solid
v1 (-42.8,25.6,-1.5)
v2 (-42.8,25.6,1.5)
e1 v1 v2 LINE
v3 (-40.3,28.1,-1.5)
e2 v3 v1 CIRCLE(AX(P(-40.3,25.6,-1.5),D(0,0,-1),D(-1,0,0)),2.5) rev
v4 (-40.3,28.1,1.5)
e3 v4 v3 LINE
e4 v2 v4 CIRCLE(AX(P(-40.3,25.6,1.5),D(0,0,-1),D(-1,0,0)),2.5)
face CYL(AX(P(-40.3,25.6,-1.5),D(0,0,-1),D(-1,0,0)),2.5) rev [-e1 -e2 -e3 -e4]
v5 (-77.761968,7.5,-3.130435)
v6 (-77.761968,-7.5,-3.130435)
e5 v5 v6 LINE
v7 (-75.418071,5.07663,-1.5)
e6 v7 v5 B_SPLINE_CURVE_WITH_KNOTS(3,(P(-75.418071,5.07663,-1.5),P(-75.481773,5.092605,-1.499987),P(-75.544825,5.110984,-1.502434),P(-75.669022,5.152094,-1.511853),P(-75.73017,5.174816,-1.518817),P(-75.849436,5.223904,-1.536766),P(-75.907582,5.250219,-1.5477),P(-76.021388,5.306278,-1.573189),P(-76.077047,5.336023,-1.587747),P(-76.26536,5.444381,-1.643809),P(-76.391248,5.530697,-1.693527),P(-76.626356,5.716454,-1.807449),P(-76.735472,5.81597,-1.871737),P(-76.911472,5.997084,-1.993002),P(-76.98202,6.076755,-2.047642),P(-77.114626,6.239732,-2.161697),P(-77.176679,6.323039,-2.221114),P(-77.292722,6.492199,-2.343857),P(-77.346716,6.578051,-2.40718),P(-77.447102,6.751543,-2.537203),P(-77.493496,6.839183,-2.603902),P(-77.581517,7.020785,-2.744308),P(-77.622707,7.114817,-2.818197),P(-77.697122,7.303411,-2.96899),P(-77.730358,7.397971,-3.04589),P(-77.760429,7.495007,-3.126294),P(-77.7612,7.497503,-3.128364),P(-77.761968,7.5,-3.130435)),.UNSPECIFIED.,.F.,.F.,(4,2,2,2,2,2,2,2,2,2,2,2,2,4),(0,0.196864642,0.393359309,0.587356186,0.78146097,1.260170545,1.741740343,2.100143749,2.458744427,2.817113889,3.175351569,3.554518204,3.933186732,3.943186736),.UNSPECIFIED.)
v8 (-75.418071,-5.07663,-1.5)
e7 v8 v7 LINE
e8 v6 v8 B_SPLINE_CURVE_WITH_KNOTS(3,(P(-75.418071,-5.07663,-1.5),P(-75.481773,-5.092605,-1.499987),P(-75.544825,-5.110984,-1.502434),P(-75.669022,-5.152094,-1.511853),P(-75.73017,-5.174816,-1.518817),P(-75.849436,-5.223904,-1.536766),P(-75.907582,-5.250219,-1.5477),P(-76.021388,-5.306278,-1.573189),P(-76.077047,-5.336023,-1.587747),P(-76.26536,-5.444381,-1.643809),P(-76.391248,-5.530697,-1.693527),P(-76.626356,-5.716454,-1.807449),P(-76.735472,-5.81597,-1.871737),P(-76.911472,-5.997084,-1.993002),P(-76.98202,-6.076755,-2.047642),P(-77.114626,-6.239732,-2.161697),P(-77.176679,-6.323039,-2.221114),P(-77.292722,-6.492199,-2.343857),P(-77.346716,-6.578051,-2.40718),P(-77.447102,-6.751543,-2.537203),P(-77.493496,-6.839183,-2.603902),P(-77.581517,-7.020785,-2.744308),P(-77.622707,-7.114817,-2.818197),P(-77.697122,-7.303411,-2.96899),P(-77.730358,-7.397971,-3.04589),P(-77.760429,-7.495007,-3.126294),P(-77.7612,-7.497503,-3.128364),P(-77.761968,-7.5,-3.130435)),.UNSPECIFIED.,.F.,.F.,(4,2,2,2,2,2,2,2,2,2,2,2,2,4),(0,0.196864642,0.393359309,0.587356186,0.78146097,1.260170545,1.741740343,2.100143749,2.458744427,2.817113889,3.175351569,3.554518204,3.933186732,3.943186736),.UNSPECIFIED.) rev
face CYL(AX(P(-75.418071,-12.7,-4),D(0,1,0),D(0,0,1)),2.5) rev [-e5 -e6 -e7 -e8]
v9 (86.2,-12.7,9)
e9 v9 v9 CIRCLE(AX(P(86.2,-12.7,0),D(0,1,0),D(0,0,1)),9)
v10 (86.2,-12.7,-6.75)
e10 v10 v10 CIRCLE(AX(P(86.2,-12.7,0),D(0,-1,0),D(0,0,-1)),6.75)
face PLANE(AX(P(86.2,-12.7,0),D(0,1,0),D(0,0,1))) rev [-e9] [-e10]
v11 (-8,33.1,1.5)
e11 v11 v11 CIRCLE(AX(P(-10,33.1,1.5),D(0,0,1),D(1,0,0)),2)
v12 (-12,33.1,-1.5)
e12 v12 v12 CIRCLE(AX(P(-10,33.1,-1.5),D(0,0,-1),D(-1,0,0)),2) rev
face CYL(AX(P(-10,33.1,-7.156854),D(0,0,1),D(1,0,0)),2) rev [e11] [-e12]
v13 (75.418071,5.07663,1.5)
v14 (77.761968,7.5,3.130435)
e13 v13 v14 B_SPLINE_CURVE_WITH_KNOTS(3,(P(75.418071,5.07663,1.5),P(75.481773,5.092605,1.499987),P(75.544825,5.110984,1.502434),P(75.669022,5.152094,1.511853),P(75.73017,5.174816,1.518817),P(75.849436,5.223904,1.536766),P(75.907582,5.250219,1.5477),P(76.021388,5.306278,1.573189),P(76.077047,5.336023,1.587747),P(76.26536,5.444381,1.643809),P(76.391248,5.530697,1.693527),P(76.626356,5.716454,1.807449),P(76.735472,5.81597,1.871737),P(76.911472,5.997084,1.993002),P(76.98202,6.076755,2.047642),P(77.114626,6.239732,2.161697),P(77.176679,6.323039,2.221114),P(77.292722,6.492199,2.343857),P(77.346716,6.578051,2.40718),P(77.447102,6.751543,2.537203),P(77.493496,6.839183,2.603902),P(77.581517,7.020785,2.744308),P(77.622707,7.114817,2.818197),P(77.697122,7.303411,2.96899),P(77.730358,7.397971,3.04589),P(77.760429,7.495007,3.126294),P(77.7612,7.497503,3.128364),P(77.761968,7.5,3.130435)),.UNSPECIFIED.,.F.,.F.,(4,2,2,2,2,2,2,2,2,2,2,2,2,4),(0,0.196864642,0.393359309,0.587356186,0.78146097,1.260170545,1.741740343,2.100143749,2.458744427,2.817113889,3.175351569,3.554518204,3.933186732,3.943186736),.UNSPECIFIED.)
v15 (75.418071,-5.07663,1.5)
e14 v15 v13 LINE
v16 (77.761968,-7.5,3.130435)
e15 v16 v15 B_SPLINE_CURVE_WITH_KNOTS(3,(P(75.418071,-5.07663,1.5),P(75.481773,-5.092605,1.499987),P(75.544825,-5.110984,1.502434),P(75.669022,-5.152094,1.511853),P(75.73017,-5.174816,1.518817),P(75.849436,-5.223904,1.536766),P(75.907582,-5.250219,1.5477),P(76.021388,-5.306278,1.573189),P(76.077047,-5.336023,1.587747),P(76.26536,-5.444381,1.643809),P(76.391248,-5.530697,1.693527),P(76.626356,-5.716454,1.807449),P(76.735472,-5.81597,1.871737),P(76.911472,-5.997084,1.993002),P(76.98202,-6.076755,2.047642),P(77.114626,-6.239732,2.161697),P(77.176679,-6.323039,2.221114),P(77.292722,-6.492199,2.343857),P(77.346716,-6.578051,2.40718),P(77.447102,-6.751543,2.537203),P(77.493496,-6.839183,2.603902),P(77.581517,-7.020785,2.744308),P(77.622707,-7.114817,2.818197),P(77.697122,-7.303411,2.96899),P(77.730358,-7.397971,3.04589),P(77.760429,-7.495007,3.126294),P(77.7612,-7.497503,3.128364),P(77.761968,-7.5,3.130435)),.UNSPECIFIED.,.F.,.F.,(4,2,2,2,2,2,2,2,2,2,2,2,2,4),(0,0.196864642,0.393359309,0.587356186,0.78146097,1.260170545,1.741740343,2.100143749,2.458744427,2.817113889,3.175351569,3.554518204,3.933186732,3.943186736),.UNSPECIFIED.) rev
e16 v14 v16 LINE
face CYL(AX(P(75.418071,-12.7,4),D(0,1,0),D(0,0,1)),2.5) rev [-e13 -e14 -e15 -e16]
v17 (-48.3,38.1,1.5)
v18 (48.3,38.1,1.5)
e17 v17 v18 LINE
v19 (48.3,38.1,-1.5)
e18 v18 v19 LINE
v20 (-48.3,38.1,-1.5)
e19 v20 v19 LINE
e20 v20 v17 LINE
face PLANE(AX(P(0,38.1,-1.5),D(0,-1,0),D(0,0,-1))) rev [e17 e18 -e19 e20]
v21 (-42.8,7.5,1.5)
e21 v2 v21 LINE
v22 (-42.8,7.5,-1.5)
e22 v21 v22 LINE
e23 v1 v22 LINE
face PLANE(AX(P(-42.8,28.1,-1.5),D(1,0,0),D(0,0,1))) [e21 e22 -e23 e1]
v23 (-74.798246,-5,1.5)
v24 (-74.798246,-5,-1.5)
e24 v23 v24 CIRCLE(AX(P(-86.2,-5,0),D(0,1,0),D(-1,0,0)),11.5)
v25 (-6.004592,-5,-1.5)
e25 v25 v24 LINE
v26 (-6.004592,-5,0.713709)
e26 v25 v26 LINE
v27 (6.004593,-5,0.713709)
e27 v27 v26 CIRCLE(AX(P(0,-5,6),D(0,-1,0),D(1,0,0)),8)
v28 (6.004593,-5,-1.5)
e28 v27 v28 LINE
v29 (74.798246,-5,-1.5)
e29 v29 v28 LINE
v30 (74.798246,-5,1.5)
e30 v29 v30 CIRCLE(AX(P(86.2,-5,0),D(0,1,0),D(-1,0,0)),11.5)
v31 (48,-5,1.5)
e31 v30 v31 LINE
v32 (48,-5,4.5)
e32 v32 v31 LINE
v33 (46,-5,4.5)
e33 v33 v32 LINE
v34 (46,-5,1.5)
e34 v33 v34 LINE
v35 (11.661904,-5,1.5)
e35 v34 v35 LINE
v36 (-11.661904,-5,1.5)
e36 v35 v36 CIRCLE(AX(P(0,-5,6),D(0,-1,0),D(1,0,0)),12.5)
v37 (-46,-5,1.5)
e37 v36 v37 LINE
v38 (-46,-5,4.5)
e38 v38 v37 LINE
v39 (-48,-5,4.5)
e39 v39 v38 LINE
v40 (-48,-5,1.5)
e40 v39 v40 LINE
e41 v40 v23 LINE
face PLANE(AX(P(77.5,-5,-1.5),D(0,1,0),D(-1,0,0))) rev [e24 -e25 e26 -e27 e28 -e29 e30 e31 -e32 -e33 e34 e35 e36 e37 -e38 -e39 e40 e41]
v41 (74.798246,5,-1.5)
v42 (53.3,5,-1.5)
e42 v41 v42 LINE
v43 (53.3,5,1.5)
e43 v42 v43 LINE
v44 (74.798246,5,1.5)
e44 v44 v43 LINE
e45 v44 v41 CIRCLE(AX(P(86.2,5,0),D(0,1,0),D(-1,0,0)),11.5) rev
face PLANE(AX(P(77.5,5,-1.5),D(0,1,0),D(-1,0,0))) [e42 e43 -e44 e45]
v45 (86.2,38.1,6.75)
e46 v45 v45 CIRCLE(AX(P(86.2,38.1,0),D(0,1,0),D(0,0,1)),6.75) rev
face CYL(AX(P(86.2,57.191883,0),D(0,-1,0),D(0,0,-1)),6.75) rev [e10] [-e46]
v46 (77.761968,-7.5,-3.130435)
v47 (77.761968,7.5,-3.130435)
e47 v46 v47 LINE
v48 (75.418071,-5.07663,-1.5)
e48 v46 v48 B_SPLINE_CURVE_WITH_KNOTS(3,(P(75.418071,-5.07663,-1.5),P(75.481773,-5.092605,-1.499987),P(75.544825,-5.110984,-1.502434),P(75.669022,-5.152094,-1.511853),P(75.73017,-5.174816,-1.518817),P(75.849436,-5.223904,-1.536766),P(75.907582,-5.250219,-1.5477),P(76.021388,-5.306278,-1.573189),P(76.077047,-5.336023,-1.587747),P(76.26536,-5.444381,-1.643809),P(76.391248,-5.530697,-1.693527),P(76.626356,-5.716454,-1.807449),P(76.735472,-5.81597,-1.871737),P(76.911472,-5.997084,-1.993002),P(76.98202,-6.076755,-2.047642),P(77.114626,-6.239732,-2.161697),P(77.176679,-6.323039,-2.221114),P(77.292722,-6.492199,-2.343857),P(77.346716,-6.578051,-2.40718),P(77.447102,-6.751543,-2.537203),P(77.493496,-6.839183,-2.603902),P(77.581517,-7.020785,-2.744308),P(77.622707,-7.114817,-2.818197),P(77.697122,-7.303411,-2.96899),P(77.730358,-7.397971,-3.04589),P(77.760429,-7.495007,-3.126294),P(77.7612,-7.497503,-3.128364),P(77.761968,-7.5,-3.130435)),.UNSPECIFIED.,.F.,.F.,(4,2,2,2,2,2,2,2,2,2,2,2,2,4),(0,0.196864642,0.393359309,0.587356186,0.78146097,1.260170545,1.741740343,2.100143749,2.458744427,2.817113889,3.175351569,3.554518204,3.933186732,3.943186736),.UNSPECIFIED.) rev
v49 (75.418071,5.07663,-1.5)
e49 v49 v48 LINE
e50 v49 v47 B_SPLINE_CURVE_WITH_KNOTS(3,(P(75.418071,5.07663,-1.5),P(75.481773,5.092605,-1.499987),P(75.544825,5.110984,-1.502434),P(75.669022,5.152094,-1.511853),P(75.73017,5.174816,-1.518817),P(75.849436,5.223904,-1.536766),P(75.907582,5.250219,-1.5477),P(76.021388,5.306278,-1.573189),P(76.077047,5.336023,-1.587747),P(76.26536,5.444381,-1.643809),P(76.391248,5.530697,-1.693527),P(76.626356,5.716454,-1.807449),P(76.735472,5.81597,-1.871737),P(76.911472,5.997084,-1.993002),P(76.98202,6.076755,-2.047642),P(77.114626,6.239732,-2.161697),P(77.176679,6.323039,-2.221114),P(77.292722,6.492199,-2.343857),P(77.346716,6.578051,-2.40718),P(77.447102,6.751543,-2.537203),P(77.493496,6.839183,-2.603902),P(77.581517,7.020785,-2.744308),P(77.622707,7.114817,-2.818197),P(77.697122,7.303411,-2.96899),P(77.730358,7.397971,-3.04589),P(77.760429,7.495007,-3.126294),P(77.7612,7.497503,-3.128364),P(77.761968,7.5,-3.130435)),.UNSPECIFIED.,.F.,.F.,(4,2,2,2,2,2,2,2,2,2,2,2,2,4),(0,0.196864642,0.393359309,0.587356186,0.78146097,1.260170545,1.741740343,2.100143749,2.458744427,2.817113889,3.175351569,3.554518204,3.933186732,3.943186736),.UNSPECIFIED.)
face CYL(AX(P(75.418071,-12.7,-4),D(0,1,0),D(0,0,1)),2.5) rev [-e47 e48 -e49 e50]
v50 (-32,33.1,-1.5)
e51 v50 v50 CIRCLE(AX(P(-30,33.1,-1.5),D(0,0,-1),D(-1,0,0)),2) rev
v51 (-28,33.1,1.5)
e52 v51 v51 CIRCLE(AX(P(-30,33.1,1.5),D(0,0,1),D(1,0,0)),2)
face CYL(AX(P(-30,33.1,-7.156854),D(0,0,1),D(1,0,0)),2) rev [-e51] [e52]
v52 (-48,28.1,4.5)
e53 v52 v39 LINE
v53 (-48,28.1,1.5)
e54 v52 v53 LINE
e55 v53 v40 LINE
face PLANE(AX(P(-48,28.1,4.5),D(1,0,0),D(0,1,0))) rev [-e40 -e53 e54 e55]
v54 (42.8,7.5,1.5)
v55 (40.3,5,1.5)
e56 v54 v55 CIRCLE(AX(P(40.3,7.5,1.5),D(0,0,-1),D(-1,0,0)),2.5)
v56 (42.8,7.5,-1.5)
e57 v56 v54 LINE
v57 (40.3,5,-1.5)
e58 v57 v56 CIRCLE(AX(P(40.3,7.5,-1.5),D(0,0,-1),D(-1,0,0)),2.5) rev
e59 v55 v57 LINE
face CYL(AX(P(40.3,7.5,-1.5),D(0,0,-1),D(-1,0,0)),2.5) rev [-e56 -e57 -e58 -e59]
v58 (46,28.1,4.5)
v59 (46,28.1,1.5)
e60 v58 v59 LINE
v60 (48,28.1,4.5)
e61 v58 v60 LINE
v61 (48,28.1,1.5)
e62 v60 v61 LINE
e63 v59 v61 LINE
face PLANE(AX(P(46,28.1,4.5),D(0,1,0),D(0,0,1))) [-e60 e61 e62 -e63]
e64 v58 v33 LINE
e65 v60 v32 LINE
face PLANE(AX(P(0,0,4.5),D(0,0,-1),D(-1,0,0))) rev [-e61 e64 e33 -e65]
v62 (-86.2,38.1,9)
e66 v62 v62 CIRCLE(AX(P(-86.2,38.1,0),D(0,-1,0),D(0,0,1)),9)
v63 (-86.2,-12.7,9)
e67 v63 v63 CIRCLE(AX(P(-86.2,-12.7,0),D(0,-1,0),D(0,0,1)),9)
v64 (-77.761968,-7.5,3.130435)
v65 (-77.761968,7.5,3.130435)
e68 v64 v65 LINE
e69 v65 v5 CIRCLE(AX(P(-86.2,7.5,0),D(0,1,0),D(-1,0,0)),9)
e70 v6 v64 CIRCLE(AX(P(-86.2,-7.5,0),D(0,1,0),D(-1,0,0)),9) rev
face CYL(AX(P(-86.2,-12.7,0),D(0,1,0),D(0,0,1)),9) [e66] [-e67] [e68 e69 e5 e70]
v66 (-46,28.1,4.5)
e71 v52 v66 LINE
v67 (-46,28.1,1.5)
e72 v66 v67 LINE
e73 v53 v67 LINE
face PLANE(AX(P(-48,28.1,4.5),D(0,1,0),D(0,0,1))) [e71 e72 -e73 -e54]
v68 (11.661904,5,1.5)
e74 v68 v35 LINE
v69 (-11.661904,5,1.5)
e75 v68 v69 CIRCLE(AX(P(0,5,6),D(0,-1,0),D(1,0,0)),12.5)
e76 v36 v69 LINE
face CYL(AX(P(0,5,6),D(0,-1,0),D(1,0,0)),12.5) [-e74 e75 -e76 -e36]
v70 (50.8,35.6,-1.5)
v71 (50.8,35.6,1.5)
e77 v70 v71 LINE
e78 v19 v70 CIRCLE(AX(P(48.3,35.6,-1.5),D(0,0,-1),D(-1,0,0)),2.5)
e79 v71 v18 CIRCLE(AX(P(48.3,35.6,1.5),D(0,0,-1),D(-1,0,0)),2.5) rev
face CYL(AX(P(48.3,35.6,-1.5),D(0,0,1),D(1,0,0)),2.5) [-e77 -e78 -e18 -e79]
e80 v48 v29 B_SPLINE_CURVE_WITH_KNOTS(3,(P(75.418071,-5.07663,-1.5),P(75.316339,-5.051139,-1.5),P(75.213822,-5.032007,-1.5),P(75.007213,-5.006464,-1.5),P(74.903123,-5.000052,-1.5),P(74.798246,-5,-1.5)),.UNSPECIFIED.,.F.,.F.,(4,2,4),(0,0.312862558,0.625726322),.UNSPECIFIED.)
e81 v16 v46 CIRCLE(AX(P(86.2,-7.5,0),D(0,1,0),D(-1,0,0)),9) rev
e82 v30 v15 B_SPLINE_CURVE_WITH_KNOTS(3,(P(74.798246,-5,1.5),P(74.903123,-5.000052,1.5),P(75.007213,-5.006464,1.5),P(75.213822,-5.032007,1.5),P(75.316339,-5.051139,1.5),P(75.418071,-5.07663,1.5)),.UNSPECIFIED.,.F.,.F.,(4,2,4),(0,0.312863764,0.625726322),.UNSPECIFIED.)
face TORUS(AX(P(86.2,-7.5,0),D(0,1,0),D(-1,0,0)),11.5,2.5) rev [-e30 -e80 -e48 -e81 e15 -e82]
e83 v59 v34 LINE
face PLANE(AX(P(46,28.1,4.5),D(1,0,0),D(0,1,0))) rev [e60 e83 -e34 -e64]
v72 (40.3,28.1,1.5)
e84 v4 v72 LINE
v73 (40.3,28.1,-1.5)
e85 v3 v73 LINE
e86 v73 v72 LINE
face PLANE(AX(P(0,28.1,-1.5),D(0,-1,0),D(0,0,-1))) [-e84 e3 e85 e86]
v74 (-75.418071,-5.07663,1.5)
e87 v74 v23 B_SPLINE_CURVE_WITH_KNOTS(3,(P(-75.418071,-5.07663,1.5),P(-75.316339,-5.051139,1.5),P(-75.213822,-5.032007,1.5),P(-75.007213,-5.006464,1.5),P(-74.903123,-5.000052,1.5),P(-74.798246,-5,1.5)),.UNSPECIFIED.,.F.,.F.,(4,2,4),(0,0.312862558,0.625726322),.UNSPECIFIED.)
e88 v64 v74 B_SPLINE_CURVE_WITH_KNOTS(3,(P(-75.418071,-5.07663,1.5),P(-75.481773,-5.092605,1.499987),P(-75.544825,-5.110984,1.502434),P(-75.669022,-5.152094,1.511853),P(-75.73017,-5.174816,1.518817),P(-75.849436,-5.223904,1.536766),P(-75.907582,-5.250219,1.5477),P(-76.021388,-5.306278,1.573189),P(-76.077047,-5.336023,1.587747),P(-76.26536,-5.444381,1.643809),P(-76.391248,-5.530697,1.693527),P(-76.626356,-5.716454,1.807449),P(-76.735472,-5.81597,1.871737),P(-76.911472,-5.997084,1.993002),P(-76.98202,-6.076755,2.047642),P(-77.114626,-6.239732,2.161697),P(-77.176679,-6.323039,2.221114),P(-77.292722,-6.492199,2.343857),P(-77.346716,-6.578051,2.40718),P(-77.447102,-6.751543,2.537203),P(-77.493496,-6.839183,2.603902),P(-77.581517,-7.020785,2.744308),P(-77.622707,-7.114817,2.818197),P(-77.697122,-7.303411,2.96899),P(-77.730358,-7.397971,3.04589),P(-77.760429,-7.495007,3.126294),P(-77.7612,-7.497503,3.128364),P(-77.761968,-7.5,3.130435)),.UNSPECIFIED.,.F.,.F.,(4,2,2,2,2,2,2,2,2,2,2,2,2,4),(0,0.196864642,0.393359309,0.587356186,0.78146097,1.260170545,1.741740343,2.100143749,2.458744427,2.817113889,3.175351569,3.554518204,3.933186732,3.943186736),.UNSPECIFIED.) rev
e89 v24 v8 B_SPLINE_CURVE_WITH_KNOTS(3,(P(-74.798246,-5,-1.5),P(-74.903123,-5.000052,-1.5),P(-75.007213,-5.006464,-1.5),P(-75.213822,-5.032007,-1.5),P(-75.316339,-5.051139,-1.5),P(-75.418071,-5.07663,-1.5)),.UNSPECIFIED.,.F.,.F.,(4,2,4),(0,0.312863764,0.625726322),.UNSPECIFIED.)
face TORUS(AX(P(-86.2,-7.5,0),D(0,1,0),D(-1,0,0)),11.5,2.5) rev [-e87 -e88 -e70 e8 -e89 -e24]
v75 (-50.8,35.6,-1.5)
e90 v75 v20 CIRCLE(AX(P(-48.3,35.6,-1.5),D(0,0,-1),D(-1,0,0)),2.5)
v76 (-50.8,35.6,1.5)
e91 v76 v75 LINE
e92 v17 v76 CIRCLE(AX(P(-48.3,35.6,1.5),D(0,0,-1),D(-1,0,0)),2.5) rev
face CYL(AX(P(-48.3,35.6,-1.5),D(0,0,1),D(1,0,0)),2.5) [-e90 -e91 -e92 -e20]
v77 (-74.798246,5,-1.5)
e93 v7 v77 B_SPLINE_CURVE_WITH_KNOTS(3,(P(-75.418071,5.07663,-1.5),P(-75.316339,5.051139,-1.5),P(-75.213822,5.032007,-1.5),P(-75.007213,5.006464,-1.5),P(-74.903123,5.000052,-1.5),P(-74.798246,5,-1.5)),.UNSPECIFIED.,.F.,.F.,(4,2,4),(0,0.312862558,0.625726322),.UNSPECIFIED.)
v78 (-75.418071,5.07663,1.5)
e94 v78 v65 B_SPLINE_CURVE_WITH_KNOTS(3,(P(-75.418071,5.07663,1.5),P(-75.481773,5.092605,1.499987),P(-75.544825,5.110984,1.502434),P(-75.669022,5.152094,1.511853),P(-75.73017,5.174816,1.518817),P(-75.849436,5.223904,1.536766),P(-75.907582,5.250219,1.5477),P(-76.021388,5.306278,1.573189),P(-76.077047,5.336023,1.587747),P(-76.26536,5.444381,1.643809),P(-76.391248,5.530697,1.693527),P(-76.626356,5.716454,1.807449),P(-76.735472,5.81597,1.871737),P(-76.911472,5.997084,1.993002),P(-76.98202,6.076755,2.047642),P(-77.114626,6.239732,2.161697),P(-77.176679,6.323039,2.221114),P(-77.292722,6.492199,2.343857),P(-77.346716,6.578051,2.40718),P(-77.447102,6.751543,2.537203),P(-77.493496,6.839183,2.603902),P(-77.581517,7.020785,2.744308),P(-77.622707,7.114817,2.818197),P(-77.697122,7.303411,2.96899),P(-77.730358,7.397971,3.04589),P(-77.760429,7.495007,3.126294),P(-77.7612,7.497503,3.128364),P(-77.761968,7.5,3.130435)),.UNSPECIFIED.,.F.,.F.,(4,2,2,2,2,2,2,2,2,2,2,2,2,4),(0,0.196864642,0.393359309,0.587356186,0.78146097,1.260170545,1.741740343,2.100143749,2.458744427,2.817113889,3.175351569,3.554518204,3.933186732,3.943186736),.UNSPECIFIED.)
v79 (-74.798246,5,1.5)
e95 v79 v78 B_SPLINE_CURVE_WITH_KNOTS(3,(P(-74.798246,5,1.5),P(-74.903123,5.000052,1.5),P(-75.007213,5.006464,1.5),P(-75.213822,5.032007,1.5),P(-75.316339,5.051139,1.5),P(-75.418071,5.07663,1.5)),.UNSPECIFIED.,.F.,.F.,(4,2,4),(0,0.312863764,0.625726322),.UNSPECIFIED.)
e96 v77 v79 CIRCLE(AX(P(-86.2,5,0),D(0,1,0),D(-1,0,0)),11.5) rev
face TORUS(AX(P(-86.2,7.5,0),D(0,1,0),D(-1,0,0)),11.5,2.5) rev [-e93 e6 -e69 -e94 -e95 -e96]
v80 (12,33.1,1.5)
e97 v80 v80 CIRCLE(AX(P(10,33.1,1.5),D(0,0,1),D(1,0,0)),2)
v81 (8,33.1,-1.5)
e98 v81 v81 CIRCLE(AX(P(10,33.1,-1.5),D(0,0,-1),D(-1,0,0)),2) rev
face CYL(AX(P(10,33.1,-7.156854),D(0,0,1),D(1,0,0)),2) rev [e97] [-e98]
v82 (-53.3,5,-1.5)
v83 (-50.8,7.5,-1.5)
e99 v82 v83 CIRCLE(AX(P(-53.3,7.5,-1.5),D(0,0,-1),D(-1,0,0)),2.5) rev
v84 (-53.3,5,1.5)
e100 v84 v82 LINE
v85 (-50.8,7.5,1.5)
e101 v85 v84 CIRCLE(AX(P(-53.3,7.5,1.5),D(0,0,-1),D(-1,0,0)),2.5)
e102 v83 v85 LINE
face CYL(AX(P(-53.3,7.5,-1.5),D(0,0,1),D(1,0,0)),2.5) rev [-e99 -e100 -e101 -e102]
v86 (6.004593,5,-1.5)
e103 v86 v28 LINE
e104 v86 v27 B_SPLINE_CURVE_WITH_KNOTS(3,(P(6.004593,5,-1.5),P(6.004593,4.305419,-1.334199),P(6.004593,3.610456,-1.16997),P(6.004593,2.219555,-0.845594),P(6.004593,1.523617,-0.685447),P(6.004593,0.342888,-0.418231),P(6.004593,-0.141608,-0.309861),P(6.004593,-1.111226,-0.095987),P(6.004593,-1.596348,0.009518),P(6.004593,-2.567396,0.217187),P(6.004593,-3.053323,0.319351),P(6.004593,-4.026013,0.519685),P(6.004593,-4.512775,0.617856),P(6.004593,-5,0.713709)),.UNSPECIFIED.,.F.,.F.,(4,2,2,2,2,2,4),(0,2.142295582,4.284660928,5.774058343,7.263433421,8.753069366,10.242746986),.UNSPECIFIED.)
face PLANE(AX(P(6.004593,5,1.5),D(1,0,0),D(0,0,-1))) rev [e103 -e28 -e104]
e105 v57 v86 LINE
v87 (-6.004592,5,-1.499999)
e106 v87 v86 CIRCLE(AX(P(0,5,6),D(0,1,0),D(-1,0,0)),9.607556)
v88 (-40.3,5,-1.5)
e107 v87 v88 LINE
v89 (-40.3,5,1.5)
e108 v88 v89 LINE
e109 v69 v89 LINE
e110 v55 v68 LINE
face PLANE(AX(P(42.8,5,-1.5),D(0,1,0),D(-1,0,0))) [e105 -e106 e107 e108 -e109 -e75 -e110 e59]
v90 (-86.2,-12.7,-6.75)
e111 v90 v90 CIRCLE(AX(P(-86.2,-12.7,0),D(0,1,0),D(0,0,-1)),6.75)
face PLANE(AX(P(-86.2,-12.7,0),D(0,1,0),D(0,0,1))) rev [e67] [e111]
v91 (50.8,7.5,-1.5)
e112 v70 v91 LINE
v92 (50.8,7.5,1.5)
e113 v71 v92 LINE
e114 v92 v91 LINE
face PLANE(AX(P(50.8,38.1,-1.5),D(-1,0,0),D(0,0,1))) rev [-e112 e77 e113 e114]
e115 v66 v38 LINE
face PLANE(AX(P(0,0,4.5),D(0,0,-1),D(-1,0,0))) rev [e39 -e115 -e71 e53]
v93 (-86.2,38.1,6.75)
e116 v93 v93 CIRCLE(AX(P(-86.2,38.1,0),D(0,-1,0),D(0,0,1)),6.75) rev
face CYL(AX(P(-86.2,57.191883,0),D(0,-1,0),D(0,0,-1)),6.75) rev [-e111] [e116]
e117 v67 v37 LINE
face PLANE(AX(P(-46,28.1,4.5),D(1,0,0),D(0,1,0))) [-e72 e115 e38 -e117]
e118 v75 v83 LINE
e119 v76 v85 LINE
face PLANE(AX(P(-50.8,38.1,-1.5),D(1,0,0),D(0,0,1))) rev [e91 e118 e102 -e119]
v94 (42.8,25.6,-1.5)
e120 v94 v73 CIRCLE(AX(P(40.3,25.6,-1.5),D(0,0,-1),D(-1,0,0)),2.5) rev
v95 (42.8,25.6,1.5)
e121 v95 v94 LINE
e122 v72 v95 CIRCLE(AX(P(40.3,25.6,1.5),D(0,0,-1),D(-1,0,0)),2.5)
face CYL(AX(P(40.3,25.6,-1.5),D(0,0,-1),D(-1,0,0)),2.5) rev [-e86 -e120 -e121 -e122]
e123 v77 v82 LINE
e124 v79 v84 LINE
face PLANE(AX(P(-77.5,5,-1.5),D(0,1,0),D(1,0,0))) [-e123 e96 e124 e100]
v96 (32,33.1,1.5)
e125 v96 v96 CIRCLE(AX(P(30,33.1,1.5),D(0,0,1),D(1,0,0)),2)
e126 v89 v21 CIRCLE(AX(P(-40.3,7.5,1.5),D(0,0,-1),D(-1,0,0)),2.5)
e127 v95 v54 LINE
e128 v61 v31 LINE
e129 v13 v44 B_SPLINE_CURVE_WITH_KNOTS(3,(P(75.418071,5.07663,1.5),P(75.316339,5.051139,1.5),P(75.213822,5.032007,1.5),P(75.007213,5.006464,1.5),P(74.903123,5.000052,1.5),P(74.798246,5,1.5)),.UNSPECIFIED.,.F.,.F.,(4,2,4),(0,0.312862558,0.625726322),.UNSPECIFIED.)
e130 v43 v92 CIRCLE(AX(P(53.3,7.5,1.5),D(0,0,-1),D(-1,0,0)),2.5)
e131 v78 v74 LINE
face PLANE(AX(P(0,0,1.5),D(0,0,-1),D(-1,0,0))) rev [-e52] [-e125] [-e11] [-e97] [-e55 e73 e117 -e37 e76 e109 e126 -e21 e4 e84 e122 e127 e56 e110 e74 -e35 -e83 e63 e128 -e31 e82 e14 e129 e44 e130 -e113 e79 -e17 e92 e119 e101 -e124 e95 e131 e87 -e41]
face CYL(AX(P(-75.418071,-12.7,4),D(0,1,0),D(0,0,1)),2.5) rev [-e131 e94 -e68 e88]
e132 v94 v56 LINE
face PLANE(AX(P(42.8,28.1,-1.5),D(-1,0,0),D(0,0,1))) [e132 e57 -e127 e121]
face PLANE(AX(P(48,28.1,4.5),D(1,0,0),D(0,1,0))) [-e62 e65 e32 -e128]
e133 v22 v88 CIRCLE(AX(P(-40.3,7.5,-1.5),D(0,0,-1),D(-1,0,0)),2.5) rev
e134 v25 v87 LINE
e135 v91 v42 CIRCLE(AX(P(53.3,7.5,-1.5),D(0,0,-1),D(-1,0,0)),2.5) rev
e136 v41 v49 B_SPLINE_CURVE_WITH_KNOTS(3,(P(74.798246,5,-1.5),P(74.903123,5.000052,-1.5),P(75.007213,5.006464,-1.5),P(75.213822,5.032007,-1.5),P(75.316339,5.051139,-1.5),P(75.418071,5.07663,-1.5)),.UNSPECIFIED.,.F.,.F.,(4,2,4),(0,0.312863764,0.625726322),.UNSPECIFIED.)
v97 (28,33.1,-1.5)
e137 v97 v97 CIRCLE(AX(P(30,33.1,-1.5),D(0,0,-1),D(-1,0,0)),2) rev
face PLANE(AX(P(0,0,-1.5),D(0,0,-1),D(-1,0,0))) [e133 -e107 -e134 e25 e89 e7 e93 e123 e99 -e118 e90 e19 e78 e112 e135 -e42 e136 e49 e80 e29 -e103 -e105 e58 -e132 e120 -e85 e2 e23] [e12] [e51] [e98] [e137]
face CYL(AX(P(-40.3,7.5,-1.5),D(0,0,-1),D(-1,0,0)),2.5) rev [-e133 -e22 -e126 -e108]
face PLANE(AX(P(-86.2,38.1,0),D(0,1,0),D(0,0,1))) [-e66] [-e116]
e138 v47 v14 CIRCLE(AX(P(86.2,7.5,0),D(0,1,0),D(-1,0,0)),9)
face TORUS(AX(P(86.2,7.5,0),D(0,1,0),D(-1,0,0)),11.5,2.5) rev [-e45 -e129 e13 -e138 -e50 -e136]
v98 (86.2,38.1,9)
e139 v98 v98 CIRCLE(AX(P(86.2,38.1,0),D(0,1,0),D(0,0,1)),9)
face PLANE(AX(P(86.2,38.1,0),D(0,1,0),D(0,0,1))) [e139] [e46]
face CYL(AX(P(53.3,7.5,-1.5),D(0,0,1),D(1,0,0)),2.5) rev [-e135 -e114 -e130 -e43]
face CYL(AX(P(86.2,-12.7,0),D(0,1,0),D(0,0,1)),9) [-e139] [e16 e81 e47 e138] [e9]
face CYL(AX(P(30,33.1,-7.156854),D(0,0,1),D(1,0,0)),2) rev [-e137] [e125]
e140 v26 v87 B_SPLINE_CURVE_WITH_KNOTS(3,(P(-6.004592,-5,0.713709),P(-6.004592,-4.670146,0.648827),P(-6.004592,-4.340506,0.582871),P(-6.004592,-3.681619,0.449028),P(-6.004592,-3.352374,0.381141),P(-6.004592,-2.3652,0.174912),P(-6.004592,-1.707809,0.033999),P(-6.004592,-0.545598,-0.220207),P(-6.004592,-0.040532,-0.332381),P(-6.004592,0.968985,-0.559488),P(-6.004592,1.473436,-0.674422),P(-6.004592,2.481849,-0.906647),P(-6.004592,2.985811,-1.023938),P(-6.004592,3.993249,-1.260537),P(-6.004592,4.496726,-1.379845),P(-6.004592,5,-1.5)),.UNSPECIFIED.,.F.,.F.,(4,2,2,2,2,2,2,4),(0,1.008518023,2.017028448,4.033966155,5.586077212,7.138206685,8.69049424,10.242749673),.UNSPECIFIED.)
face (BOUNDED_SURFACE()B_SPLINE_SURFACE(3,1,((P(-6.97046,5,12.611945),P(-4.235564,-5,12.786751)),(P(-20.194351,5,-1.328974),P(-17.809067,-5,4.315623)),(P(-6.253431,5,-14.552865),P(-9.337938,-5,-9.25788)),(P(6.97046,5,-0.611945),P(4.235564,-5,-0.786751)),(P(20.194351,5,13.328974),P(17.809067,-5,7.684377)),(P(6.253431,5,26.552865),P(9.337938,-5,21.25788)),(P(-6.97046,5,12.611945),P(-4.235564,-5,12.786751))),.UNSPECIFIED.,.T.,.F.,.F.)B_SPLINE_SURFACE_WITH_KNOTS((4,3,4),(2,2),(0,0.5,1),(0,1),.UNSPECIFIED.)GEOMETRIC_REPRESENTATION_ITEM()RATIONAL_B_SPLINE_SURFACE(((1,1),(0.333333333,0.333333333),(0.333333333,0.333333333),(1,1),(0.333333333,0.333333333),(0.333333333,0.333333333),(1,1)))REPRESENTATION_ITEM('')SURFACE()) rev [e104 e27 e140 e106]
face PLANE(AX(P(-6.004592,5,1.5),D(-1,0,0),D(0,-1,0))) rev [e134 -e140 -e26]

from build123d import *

# Parameters (mm, degrees)
BOSS_EXTRUDE1_DEPTH      = 38.1
BOSS_EXTRUDE1_DEPTH_BACK = 12.7
SKETCH1_R                = 9
SKETCH2_R                = 6.75
CUT_EXTRUDE1_DEPTH       = 50.8
BOSS_EXTRUDE2_DEPTH      = 1.5
BOSS_EXTRUDE2_DEPTH_BACK = 1.5
BOSS_EXTRUDE3_DEPTH      = 10
SKETCH9_W                = 12.009184536
SKETCH9_H                = 15.938825618
CUT_EXTRUDE2_DEPTH       = 3
SKETCH10_R               = 2
CUT_EXTRUDE3_DEPTH       = 3
SKETCH11_W               = 2
SKETCH11_H               = 33.1
BOSS_EXTRUDE4_DEPTH      = 3
FILLET1_R                = 2.5


with BuildPart() as part:
    # Sketch1 → Boss-Extrude1 (new, two sides: drawn at the far end of the back side and taken through both)
    with BuildSketch(Plane(origin=(0, 0, 0), x_dir=(1, 0, 0), z_dir=(0, 1, 0)).offset(-BOSS_EXTRUDE1_DEPTH_BACK)):
        with Locations(Location((86.2, 0, 0), (0, 0, 270))):
            Circle(SKETCH1_R)
    extrude(amount=BOSS_EXTRUDE1_DEPTH + BOSS_EXTRUDE1_DEPTH_BACK)

    # Sketch2 → Cut-Extrude1 (cut)
    with BuildSketch(Plane(origin=(0, -12.7, 0), x_dir=(-1, 0, 0), z_dir=(0, -1, 0))):
        with Locations(Location((-86.2, 0, 0), (0, 0, 90))):
            Circle(SKETCH2_R)
    extrude(amount=-CUT_EXTRUDE1_DEPTH, mode=Mode.SUBTRACT)

    # Sketch4 → Boss-Extrude2 (add, two sides: drawn at the far end of the back side and taken through both)
    with BuildSketch(Plane.XY.offset(-BOSS_EXTRUDE2_DEPTH_BACK)):
        Polygon((77.5, -5), (0, -5), (0, 5), (42.8, 5), (42.8, 28.1), (0, 28.1), (0, 38.1), (50.8, 38.1), (50.8, 28.1), (50.8, 5), (77.5, 5), align=None)
    extrude(amount=BOSS_EXTRUDE2_DEPTH + BOSS_EXTRUDE2_DEPTH_BACK)

    # Mirror2: part across plane


with BuildPart() as part_1:
    add(part.part)
    add(part.part.mirror(Plane(origin=(0, 38.1, -1.5), x_dir=(0, 0, 1), z_dir=(-1, 0, 0))))

    # Sketch6 → Boss-Extrude3 (add)
    with BuildSketch(Plane.XZ.offset(5)):
        with BuildLine():
            Line((10, -1.5), (-10, -1.5))
            ThreePointArc((-10, -1.5), (0, 18.5), (10, -1.5))
        make_face()
    extrude(amount=-BOSS_EXTRUDE3_DEPTH)

    # Cut-Loft1: read off the stored shape, not the designer's step
    # Cut-Loft1: loft between two sections, ruled curve by curve
    cut_loft1_from = [
        Edge.make_bspline([(-6.970459828, 5, 12.611945372), (-20.194350572, 5, -1.328974284), (-6.253430916, 5, -14.552865027), (6.970459828, 5, -0.611945372), (20.194350572, 5, 13.328974284), (6.253430916, 5, 26.552865027), (-6.970459828, 5, 12.611945372)], [0, 0, 0, 0, 0.5, 0.5, 0.5, 1, 1, 1, 1], 3, [1, 0.333333333, 0.333333333, 1, 0.333333333, 0.333333333, 1]),
    ]
    cut_loft1_to = [
        Edge.make_bspline([(-4.235564338, -5, 12.786751413), (-17.809067164, -5, 4.315622738), (-9.337938488, -5, -9.257880088), (4.235564338, -5, -0.786751413), (17.809067164, -5, 7.684377262), (9.337938488, -5, 21.257880088), (-4.235564338, -5, 12.786751413)], [0, 0, 0, 0, 0.5, 0.5, 0.5, 1, 1, 1, 1], 3, [1, 0.333333333, 0.333333333, 1, 0.333333333, 0.333333333, 1]),
    ]
    cut_loft1 = Solid(Shell([*[Face.make_surface_from_curves(cut_loft1_from[k], cut_loft1_to[k]) for k in range(1)], Face(Wire(cut_loft1_from)), Face(Wire(cut_loft1_to))]))
    add(cut_loft1, mode=Mode.SUBTRACT)

    # Sketch9 → Cut-Extrude2 (cut)
    with BuildSketch(Plane(origin=(0, 0, -1.5), x_dir=(-1, 0, 0), z_dir=(0, 0, -1))):
        with Locations((-2.92e-07, -2.969412809)):
            Rectangle(SKETCH9_W, SKETCH9_H)
    extrude(amount=-CUT_EXTRUDE2_DEPTH, mode=Mode.SUBTRACT)

    # Sketch10 → Cut-Extrude3 (cut)
    with BuildSketch(Plane.XY.offset(1.5)):
        with Locations((-30, 33.1)):
            Circle(SKETCH10_R)
        with Locations((-10, 33.1)):
            Circle(SKETCH10_R)
        with Locations((10, 33.1)):
            Circle(SKETCH10_R)
        with Locations((30, 33.1)):
            Circle(SKETCH10_R)
    extrude(amount=-CUT_EXTRUDE3_DEPTH, mode=Mode.SUBTRACT)

    # Sketch11 → Boss-Extrude4 (add)
    with BuildSketch(Plane.XY.offset(1.5)):
        with Locations((-47, 11.55)):
            Rectangle(SKETCH11_W, SKETCH11_H)
        with Locations((47, 11.55)):
            Rectangle(SKETCH11_W, SKETCH11_H)
    extrude(amount=BOSS_EXTRUDE4_DEPTH)

    # Fillet1
    fillet1_edges = [part_1.edges().sort_by_distance(p)[0] for p in [
        (50.8, 5, 0),
        (-50.8, 5, 0),
        (-42.8, 5, 0),
        (-42.8, 28.1, 0),
        (42.8, 5, 0),
        (42.8, 28.1, 0),
        (-77.325880325, 0, -1.5),
        (-77.325880325, 0, 1.5),
        (-77.2, -5, 0),
        (-77.2, 5, 0),
        (77.325880325, 0, -1.5),
        (77.2, -5, 0),
        (77.325880325, 0, 1.5),
        (77.2, 5, 0),
        (50.8, 38.1, 0),
        (-50.8, 38.1, 0),
    ]]
    fillet(fillet1_edges, radius=FILLET1_R)


solid = part_1.part
